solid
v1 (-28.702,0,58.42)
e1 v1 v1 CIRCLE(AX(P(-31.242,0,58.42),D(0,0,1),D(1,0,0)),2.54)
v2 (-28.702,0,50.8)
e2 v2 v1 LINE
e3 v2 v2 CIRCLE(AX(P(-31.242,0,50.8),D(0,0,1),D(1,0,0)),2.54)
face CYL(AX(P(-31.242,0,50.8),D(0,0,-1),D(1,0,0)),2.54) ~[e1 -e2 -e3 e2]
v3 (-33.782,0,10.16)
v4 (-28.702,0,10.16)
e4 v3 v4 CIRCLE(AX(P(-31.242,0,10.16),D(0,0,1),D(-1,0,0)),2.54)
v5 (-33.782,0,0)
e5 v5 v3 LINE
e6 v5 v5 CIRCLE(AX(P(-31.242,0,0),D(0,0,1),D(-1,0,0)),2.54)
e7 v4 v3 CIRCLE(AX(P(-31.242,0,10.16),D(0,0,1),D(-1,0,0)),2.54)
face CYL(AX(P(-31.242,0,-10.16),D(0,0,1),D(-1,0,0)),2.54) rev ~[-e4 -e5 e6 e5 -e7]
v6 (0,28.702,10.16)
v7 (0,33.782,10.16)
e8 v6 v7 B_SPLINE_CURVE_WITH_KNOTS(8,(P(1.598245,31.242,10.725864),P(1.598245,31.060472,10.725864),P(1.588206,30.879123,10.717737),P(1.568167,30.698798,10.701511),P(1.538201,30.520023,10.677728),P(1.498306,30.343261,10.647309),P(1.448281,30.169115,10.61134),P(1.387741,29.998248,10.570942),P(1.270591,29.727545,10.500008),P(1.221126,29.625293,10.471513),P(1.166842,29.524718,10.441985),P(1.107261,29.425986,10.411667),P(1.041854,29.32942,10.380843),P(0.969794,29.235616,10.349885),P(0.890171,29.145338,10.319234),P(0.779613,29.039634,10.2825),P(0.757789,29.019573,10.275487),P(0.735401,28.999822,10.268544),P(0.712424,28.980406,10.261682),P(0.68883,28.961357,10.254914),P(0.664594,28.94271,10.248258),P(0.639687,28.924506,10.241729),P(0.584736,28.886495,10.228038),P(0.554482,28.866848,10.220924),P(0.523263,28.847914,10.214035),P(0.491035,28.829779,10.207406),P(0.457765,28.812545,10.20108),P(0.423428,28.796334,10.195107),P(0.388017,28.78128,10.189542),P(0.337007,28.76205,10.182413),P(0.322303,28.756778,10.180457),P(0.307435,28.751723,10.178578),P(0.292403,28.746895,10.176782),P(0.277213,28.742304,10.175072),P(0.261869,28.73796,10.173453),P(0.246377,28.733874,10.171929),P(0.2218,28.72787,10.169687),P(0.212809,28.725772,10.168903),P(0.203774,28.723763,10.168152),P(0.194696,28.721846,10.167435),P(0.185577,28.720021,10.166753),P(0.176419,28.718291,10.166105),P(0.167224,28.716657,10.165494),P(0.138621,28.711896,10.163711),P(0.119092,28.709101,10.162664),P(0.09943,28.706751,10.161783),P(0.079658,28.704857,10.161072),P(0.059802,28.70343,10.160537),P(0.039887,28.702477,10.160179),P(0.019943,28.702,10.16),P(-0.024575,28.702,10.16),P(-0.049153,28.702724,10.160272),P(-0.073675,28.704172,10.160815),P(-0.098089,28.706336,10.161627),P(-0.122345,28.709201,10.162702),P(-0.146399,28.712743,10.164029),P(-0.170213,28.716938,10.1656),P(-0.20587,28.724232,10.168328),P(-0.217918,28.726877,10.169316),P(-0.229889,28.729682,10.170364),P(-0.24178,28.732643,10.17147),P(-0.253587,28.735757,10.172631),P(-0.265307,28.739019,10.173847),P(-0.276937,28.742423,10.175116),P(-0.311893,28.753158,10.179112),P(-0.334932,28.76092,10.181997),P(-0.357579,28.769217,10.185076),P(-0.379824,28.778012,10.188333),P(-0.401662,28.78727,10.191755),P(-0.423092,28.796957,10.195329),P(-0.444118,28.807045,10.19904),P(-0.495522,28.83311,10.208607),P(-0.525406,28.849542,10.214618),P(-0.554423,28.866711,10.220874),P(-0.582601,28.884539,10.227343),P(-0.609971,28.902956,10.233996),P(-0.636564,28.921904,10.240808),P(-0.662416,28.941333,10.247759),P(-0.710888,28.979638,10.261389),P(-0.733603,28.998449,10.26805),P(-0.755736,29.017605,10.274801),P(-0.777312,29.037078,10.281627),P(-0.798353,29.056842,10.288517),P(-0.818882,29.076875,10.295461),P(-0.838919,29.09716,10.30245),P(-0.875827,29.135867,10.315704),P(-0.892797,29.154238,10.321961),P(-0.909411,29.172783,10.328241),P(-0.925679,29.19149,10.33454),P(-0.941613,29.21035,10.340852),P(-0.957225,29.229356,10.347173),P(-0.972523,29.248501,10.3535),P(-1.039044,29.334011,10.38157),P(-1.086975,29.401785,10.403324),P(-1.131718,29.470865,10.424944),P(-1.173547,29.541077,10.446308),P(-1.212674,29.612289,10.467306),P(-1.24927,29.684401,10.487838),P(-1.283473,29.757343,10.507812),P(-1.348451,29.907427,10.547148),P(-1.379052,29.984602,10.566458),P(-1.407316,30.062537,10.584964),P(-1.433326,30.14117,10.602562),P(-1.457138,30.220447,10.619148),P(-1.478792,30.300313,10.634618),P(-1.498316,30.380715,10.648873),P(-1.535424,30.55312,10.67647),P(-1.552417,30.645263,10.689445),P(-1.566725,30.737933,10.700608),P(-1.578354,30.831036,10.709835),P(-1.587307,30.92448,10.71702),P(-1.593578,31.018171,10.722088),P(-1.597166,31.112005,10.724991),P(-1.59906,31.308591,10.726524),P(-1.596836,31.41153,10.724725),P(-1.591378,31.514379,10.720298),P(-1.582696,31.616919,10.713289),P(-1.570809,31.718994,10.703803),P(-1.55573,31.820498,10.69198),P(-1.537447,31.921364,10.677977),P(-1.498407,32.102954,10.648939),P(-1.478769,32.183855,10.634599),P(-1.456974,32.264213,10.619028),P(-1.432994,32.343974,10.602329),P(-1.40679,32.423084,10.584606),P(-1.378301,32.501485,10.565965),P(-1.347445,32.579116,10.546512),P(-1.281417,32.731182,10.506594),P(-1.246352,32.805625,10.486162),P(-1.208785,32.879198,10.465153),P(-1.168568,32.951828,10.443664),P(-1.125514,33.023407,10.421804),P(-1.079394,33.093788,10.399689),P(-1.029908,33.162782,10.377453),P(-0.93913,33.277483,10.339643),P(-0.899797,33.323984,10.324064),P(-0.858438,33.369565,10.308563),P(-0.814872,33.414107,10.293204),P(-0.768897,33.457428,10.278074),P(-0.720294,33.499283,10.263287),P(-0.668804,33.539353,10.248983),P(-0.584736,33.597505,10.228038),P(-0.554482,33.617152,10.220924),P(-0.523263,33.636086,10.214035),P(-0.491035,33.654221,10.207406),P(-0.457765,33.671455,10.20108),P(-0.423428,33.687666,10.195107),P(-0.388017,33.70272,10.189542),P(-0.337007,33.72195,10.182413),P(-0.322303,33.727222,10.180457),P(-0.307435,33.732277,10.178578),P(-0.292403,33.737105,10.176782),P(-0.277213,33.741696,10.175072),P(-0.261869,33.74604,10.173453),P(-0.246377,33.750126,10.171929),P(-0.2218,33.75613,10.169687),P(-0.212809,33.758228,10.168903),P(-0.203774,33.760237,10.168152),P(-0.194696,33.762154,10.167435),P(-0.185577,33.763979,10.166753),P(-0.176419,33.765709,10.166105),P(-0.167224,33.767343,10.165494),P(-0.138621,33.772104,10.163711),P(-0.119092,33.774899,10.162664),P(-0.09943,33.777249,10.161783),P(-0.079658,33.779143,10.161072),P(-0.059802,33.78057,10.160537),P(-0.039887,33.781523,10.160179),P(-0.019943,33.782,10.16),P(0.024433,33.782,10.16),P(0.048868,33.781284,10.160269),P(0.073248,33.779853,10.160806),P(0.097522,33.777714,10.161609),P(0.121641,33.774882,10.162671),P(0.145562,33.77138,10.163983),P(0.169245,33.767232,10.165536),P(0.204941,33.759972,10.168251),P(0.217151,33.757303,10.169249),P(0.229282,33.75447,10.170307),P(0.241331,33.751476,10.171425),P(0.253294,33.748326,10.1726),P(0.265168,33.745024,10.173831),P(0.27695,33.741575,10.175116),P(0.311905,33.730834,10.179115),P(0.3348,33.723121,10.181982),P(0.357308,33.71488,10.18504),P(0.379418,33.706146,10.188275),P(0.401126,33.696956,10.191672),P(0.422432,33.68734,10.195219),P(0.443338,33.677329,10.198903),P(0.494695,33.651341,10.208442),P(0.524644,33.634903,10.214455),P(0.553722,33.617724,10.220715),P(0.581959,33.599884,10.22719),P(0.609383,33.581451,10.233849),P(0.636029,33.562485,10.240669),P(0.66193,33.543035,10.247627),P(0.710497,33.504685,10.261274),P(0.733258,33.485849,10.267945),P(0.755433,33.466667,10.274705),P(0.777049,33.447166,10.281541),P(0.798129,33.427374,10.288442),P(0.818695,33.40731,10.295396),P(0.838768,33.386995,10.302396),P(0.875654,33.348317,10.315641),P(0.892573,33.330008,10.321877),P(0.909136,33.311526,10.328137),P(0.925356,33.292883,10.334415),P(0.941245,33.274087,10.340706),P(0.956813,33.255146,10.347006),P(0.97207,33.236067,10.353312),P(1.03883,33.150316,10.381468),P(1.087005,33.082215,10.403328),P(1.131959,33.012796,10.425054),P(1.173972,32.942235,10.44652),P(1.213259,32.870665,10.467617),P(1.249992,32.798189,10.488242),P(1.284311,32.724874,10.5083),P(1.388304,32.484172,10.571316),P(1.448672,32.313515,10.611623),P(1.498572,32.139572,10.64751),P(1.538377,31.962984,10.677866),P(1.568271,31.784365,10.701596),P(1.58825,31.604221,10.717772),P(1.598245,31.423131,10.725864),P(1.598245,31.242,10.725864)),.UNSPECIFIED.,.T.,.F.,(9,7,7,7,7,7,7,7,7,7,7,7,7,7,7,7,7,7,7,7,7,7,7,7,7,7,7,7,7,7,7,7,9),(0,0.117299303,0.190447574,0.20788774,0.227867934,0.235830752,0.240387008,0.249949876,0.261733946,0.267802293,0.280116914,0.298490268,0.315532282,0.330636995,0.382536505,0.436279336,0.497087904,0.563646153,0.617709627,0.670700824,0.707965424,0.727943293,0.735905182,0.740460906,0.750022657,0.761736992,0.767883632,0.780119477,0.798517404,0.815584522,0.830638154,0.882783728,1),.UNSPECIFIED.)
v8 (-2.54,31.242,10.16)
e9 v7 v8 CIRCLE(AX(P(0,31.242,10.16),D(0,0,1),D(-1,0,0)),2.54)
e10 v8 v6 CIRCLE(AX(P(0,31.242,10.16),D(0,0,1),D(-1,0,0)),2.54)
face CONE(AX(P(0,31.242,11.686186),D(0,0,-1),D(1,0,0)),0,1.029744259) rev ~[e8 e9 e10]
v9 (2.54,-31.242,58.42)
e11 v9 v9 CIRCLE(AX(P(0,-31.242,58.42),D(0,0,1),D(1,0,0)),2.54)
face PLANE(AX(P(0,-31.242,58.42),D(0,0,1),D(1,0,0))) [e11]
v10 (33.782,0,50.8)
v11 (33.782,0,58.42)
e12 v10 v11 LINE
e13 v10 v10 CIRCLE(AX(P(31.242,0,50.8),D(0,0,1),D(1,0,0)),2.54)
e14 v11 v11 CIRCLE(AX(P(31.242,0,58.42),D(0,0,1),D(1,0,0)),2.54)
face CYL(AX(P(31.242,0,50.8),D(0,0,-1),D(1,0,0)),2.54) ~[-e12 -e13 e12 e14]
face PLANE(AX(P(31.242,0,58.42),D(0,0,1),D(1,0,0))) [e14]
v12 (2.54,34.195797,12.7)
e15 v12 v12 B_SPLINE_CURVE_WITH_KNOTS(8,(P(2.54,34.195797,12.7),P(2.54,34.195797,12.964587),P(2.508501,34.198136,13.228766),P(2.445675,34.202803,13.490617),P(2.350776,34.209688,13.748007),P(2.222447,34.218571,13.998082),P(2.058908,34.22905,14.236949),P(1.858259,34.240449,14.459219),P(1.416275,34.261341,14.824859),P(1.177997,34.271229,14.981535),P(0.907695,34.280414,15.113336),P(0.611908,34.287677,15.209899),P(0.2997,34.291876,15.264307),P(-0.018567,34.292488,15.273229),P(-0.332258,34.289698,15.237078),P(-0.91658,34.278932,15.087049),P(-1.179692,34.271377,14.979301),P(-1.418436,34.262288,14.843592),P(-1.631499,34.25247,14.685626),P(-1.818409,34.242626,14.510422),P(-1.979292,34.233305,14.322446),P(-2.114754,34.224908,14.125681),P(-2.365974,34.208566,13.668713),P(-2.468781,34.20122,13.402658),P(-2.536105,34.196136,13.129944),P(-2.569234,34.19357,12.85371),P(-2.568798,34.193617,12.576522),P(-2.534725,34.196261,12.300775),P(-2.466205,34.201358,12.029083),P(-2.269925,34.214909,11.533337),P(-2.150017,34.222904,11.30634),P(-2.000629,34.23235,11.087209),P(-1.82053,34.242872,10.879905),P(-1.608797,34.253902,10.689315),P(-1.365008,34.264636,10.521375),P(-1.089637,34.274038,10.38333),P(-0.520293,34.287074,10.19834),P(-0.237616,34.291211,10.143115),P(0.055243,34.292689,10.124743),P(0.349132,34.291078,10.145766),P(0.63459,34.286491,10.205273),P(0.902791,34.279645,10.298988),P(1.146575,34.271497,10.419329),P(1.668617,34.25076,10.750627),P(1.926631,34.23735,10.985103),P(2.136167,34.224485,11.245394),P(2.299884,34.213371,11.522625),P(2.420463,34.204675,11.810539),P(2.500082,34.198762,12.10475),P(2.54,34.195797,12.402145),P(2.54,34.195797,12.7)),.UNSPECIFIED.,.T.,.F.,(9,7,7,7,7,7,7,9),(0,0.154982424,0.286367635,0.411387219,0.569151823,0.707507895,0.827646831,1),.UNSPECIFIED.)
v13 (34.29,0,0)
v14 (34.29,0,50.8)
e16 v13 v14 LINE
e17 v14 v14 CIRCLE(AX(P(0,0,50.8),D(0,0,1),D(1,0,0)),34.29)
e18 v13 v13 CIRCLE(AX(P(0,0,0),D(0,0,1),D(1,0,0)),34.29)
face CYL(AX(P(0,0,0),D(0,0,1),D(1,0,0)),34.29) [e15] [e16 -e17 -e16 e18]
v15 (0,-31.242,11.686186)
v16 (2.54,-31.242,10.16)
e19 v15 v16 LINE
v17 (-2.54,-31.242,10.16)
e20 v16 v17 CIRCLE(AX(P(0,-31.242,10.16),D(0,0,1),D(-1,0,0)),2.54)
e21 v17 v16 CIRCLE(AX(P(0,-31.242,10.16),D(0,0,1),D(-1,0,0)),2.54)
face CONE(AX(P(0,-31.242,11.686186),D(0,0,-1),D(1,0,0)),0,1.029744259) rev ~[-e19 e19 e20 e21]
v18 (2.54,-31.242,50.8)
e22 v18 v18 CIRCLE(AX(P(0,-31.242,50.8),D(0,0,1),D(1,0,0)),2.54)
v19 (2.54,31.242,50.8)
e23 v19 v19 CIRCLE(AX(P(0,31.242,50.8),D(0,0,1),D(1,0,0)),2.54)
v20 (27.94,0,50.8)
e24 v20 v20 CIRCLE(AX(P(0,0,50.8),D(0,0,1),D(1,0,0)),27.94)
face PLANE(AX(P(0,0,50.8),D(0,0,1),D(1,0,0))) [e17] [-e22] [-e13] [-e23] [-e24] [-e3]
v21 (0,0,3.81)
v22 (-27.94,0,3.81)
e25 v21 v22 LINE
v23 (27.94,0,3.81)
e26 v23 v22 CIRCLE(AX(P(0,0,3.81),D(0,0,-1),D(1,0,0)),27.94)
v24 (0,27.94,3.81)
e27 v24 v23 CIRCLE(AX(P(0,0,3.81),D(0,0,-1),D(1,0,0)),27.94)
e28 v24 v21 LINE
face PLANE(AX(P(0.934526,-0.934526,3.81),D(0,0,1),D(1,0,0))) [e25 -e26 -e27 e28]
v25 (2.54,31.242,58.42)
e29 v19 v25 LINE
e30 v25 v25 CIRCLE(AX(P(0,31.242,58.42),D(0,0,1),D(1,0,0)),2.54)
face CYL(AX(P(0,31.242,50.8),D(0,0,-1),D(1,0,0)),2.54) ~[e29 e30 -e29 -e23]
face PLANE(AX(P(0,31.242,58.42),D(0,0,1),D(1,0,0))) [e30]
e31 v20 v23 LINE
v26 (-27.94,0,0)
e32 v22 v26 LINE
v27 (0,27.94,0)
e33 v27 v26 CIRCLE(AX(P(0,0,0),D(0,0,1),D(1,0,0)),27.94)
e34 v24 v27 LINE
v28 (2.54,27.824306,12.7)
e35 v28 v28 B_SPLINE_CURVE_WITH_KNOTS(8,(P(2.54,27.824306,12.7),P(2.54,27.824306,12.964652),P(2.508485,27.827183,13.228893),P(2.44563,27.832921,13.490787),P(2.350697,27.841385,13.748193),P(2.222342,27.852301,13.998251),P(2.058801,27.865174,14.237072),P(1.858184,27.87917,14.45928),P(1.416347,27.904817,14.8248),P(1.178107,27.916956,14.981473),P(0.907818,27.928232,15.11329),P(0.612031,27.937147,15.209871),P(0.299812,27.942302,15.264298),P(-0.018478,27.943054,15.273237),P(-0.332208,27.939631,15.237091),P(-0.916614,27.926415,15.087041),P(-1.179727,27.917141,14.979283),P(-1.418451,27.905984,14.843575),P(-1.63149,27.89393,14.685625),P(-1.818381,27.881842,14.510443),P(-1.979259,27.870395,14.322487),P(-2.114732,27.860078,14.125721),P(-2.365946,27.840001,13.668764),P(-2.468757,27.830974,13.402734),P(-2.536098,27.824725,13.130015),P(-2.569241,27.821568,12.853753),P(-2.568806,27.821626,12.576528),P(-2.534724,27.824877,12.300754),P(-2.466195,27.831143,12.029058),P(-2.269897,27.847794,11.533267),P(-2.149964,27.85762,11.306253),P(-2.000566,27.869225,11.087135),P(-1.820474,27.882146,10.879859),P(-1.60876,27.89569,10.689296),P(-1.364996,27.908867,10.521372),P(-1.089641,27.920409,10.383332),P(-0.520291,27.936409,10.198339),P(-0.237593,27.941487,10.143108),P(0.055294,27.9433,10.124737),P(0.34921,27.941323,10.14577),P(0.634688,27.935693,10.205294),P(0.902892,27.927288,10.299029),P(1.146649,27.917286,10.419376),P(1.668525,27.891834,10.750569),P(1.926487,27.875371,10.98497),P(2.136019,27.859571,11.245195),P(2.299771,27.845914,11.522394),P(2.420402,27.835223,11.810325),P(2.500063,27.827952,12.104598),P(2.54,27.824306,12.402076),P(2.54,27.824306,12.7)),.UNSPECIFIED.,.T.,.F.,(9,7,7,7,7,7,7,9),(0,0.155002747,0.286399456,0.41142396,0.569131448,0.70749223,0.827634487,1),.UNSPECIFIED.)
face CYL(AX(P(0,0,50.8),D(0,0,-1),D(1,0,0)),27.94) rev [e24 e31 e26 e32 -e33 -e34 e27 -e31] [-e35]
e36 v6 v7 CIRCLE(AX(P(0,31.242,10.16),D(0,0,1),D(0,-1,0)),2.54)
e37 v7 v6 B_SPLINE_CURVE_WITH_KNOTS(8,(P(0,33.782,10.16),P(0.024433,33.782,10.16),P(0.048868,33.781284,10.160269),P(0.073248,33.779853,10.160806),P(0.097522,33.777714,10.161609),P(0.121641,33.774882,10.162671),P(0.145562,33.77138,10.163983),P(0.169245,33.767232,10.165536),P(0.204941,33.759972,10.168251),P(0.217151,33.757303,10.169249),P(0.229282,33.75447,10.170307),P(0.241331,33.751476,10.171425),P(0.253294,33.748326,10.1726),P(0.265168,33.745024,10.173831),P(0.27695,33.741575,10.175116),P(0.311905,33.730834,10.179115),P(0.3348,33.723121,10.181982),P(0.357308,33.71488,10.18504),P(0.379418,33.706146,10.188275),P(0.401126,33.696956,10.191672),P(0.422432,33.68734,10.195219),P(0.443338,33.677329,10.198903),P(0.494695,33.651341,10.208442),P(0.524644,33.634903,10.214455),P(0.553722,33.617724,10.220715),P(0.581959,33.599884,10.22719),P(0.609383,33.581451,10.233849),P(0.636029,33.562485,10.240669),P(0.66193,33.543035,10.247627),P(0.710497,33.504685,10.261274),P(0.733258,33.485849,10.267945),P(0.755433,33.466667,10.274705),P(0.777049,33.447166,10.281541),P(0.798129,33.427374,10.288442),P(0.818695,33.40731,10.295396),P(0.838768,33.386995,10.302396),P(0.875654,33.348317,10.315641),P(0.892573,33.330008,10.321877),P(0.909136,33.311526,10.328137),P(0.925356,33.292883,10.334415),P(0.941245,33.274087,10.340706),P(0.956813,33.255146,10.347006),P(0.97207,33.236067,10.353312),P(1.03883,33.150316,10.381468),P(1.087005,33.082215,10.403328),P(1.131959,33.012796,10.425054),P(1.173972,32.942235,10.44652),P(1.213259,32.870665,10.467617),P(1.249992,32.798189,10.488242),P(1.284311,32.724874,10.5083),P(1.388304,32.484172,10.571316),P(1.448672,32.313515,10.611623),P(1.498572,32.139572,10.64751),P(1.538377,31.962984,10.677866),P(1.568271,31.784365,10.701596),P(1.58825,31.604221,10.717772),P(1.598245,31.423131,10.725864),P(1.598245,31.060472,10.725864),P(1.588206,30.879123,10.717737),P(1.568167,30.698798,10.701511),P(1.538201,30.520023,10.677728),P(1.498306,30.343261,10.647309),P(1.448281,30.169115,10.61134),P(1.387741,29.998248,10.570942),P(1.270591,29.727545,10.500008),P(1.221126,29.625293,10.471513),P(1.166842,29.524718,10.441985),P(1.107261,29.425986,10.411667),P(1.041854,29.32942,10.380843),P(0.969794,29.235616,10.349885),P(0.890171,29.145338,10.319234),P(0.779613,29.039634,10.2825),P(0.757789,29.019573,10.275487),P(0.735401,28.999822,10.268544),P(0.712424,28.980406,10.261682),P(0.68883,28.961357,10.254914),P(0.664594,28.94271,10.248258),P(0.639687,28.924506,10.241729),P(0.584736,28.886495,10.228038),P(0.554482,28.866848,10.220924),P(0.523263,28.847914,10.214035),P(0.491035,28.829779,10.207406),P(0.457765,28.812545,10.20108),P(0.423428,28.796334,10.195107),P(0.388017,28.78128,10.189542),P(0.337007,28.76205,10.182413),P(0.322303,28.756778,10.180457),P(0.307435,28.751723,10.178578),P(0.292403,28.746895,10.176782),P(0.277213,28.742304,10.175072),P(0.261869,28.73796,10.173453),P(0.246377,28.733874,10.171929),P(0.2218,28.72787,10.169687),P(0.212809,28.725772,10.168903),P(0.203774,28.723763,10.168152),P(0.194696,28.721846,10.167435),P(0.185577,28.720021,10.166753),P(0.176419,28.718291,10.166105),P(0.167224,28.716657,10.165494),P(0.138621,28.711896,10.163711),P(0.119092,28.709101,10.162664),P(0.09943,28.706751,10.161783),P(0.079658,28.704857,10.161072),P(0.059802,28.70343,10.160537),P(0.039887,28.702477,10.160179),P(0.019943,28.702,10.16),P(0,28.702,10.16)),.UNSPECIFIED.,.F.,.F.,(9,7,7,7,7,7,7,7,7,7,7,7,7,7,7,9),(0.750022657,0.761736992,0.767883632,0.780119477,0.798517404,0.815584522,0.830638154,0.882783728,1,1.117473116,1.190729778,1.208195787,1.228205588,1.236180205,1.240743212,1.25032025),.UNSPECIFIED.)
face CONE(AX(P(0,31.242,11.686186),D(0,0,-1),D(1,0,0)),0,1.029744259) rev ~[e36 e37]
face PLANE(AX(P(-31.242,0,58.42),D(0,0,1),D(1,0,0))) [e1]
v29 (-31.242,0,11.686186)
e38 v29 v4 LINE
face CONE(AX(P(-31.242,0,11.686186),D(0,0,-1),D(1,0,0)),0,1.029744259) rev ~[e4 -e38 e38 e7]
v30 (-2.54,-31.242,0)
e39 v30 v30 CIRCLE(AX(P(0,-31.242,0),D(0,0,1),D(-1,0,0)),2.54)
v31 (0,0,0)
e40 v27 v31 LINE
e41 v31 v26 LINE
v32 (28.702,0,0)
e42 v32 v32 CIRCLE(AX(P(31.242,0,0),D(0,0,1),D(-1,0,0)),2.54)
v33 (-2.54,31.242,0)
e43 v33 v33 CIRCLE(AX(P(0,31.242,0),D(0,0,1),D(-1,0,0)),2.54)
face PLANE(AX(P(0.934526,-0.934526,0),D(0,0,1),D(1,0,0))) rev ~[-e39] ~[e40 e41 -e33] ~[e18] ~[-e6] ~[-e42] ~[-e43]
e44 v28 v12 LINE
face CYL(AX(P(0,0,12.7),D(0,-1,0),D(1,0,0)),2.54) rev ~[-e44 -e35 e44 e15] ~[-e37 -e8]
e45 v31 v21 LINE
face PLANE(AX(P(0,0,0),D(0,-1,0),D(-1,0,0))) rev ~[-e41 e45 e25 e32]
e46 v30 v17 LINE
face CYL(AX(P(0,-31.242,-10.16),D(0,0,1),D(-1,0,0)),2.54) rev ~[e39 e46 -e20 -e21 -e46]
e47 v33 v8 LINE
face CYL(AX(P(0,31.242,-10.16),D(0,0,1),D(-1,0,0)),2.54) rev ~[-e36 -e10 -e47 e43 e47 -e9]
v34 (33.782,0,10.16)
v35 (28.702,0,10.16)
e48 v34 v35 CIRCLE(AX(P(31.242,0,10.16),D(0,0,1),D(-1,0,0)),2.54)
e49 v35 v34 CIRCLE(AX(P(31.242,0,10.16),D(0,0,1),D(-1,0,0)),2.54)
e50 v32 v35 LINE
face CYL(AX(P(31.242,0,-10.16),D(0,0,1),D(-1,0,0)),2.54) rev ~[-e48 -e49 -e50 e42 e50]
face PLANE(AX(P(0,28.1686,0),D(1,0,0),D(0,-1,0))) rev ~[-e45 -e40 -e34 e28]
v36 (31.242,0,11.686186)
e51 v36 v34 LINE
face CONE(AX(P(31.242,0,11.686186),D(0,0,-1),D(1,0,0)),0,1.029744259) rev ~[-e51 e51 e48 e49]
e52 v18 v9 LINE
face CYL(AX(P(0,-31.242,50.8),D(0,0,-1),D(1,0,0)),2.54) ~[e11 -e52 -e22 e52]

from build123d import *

# Parameters (mm, degrees)
F2_R     = 2.54
F3_DEPTH = 7.62
F4_D     = 5.08
F4_DEPTH = 34.291
F6_D     = 5.08
F6_DEPTH = 10.16
F6_TIP   = 1.5261859723
F8_DEPTH = 3.81


with BuildPart() as f1:
    # F0 (on Front) → F1 (revolve)
    with BuildSketch(Plane.XZ):
        Polygon((27.94, 20.2932615928), (27.94, 0), (34.29, 0), (34.29, 50.8), (27.94, 50.8), align=None)
    revolve(axis=Axis((0, 0, 10.1466307964), (0, 0, 1)))

    # F2 (on face) → F3 (join)
    with BuildSketch(Plane.XY.offset(50.8)):
        with Locations((0, 31.242)):
            Circle(F2_R)
        with Locations((31.242, 0)):
            Circle(F2_R)
        with Locations((0, -31.242)):
            Circle(F2_R)
        with Locations((-31.242, 0)):
            Circle(F2_R)
    extrude(amount=F3_DEPTH)

    # F4 (through all, one way)
    with BuildSketch(Plane.XZ):
        with Locations((0, 12.7)):
            Circle(F4_D / 2)
    extrude(amount=-F4_DEPTH, mode=Mode.SUBTRACT)

    # F6
    with Locations(Plane(origin=(0, 0, 0), x_dir=(1, 0, 0), z_dir=(0, 0, -1))):
        with Locations((0, 31.242), (31.242, 0), (0, -31.242), (-31.242, 0)):
            Hole(F6_D / 2, depth=F6_DEPTH)
            with Locations((0, 0, -(F6_DEPTH + F6_TIP / 2))):  # 118° drill point
                Cone(0, F6_D / 2, F6_TIP, mode=Mode.SUBTRACT)

    # F7 (on Top) → F8 (join)
    with BuildSketch(Plane.XY):
        with BuildLine():
            Line((0, 0), (-28.1686, 0))
            ThreePointArc((-28.1686, 0), (19.9182080765, -19.9182080765), (0, 28.1686))
            Line((0, 28.1686), (0, 0))
        make_face()
    extrude(amount=F8_DEPTH)


solid = f1.part
